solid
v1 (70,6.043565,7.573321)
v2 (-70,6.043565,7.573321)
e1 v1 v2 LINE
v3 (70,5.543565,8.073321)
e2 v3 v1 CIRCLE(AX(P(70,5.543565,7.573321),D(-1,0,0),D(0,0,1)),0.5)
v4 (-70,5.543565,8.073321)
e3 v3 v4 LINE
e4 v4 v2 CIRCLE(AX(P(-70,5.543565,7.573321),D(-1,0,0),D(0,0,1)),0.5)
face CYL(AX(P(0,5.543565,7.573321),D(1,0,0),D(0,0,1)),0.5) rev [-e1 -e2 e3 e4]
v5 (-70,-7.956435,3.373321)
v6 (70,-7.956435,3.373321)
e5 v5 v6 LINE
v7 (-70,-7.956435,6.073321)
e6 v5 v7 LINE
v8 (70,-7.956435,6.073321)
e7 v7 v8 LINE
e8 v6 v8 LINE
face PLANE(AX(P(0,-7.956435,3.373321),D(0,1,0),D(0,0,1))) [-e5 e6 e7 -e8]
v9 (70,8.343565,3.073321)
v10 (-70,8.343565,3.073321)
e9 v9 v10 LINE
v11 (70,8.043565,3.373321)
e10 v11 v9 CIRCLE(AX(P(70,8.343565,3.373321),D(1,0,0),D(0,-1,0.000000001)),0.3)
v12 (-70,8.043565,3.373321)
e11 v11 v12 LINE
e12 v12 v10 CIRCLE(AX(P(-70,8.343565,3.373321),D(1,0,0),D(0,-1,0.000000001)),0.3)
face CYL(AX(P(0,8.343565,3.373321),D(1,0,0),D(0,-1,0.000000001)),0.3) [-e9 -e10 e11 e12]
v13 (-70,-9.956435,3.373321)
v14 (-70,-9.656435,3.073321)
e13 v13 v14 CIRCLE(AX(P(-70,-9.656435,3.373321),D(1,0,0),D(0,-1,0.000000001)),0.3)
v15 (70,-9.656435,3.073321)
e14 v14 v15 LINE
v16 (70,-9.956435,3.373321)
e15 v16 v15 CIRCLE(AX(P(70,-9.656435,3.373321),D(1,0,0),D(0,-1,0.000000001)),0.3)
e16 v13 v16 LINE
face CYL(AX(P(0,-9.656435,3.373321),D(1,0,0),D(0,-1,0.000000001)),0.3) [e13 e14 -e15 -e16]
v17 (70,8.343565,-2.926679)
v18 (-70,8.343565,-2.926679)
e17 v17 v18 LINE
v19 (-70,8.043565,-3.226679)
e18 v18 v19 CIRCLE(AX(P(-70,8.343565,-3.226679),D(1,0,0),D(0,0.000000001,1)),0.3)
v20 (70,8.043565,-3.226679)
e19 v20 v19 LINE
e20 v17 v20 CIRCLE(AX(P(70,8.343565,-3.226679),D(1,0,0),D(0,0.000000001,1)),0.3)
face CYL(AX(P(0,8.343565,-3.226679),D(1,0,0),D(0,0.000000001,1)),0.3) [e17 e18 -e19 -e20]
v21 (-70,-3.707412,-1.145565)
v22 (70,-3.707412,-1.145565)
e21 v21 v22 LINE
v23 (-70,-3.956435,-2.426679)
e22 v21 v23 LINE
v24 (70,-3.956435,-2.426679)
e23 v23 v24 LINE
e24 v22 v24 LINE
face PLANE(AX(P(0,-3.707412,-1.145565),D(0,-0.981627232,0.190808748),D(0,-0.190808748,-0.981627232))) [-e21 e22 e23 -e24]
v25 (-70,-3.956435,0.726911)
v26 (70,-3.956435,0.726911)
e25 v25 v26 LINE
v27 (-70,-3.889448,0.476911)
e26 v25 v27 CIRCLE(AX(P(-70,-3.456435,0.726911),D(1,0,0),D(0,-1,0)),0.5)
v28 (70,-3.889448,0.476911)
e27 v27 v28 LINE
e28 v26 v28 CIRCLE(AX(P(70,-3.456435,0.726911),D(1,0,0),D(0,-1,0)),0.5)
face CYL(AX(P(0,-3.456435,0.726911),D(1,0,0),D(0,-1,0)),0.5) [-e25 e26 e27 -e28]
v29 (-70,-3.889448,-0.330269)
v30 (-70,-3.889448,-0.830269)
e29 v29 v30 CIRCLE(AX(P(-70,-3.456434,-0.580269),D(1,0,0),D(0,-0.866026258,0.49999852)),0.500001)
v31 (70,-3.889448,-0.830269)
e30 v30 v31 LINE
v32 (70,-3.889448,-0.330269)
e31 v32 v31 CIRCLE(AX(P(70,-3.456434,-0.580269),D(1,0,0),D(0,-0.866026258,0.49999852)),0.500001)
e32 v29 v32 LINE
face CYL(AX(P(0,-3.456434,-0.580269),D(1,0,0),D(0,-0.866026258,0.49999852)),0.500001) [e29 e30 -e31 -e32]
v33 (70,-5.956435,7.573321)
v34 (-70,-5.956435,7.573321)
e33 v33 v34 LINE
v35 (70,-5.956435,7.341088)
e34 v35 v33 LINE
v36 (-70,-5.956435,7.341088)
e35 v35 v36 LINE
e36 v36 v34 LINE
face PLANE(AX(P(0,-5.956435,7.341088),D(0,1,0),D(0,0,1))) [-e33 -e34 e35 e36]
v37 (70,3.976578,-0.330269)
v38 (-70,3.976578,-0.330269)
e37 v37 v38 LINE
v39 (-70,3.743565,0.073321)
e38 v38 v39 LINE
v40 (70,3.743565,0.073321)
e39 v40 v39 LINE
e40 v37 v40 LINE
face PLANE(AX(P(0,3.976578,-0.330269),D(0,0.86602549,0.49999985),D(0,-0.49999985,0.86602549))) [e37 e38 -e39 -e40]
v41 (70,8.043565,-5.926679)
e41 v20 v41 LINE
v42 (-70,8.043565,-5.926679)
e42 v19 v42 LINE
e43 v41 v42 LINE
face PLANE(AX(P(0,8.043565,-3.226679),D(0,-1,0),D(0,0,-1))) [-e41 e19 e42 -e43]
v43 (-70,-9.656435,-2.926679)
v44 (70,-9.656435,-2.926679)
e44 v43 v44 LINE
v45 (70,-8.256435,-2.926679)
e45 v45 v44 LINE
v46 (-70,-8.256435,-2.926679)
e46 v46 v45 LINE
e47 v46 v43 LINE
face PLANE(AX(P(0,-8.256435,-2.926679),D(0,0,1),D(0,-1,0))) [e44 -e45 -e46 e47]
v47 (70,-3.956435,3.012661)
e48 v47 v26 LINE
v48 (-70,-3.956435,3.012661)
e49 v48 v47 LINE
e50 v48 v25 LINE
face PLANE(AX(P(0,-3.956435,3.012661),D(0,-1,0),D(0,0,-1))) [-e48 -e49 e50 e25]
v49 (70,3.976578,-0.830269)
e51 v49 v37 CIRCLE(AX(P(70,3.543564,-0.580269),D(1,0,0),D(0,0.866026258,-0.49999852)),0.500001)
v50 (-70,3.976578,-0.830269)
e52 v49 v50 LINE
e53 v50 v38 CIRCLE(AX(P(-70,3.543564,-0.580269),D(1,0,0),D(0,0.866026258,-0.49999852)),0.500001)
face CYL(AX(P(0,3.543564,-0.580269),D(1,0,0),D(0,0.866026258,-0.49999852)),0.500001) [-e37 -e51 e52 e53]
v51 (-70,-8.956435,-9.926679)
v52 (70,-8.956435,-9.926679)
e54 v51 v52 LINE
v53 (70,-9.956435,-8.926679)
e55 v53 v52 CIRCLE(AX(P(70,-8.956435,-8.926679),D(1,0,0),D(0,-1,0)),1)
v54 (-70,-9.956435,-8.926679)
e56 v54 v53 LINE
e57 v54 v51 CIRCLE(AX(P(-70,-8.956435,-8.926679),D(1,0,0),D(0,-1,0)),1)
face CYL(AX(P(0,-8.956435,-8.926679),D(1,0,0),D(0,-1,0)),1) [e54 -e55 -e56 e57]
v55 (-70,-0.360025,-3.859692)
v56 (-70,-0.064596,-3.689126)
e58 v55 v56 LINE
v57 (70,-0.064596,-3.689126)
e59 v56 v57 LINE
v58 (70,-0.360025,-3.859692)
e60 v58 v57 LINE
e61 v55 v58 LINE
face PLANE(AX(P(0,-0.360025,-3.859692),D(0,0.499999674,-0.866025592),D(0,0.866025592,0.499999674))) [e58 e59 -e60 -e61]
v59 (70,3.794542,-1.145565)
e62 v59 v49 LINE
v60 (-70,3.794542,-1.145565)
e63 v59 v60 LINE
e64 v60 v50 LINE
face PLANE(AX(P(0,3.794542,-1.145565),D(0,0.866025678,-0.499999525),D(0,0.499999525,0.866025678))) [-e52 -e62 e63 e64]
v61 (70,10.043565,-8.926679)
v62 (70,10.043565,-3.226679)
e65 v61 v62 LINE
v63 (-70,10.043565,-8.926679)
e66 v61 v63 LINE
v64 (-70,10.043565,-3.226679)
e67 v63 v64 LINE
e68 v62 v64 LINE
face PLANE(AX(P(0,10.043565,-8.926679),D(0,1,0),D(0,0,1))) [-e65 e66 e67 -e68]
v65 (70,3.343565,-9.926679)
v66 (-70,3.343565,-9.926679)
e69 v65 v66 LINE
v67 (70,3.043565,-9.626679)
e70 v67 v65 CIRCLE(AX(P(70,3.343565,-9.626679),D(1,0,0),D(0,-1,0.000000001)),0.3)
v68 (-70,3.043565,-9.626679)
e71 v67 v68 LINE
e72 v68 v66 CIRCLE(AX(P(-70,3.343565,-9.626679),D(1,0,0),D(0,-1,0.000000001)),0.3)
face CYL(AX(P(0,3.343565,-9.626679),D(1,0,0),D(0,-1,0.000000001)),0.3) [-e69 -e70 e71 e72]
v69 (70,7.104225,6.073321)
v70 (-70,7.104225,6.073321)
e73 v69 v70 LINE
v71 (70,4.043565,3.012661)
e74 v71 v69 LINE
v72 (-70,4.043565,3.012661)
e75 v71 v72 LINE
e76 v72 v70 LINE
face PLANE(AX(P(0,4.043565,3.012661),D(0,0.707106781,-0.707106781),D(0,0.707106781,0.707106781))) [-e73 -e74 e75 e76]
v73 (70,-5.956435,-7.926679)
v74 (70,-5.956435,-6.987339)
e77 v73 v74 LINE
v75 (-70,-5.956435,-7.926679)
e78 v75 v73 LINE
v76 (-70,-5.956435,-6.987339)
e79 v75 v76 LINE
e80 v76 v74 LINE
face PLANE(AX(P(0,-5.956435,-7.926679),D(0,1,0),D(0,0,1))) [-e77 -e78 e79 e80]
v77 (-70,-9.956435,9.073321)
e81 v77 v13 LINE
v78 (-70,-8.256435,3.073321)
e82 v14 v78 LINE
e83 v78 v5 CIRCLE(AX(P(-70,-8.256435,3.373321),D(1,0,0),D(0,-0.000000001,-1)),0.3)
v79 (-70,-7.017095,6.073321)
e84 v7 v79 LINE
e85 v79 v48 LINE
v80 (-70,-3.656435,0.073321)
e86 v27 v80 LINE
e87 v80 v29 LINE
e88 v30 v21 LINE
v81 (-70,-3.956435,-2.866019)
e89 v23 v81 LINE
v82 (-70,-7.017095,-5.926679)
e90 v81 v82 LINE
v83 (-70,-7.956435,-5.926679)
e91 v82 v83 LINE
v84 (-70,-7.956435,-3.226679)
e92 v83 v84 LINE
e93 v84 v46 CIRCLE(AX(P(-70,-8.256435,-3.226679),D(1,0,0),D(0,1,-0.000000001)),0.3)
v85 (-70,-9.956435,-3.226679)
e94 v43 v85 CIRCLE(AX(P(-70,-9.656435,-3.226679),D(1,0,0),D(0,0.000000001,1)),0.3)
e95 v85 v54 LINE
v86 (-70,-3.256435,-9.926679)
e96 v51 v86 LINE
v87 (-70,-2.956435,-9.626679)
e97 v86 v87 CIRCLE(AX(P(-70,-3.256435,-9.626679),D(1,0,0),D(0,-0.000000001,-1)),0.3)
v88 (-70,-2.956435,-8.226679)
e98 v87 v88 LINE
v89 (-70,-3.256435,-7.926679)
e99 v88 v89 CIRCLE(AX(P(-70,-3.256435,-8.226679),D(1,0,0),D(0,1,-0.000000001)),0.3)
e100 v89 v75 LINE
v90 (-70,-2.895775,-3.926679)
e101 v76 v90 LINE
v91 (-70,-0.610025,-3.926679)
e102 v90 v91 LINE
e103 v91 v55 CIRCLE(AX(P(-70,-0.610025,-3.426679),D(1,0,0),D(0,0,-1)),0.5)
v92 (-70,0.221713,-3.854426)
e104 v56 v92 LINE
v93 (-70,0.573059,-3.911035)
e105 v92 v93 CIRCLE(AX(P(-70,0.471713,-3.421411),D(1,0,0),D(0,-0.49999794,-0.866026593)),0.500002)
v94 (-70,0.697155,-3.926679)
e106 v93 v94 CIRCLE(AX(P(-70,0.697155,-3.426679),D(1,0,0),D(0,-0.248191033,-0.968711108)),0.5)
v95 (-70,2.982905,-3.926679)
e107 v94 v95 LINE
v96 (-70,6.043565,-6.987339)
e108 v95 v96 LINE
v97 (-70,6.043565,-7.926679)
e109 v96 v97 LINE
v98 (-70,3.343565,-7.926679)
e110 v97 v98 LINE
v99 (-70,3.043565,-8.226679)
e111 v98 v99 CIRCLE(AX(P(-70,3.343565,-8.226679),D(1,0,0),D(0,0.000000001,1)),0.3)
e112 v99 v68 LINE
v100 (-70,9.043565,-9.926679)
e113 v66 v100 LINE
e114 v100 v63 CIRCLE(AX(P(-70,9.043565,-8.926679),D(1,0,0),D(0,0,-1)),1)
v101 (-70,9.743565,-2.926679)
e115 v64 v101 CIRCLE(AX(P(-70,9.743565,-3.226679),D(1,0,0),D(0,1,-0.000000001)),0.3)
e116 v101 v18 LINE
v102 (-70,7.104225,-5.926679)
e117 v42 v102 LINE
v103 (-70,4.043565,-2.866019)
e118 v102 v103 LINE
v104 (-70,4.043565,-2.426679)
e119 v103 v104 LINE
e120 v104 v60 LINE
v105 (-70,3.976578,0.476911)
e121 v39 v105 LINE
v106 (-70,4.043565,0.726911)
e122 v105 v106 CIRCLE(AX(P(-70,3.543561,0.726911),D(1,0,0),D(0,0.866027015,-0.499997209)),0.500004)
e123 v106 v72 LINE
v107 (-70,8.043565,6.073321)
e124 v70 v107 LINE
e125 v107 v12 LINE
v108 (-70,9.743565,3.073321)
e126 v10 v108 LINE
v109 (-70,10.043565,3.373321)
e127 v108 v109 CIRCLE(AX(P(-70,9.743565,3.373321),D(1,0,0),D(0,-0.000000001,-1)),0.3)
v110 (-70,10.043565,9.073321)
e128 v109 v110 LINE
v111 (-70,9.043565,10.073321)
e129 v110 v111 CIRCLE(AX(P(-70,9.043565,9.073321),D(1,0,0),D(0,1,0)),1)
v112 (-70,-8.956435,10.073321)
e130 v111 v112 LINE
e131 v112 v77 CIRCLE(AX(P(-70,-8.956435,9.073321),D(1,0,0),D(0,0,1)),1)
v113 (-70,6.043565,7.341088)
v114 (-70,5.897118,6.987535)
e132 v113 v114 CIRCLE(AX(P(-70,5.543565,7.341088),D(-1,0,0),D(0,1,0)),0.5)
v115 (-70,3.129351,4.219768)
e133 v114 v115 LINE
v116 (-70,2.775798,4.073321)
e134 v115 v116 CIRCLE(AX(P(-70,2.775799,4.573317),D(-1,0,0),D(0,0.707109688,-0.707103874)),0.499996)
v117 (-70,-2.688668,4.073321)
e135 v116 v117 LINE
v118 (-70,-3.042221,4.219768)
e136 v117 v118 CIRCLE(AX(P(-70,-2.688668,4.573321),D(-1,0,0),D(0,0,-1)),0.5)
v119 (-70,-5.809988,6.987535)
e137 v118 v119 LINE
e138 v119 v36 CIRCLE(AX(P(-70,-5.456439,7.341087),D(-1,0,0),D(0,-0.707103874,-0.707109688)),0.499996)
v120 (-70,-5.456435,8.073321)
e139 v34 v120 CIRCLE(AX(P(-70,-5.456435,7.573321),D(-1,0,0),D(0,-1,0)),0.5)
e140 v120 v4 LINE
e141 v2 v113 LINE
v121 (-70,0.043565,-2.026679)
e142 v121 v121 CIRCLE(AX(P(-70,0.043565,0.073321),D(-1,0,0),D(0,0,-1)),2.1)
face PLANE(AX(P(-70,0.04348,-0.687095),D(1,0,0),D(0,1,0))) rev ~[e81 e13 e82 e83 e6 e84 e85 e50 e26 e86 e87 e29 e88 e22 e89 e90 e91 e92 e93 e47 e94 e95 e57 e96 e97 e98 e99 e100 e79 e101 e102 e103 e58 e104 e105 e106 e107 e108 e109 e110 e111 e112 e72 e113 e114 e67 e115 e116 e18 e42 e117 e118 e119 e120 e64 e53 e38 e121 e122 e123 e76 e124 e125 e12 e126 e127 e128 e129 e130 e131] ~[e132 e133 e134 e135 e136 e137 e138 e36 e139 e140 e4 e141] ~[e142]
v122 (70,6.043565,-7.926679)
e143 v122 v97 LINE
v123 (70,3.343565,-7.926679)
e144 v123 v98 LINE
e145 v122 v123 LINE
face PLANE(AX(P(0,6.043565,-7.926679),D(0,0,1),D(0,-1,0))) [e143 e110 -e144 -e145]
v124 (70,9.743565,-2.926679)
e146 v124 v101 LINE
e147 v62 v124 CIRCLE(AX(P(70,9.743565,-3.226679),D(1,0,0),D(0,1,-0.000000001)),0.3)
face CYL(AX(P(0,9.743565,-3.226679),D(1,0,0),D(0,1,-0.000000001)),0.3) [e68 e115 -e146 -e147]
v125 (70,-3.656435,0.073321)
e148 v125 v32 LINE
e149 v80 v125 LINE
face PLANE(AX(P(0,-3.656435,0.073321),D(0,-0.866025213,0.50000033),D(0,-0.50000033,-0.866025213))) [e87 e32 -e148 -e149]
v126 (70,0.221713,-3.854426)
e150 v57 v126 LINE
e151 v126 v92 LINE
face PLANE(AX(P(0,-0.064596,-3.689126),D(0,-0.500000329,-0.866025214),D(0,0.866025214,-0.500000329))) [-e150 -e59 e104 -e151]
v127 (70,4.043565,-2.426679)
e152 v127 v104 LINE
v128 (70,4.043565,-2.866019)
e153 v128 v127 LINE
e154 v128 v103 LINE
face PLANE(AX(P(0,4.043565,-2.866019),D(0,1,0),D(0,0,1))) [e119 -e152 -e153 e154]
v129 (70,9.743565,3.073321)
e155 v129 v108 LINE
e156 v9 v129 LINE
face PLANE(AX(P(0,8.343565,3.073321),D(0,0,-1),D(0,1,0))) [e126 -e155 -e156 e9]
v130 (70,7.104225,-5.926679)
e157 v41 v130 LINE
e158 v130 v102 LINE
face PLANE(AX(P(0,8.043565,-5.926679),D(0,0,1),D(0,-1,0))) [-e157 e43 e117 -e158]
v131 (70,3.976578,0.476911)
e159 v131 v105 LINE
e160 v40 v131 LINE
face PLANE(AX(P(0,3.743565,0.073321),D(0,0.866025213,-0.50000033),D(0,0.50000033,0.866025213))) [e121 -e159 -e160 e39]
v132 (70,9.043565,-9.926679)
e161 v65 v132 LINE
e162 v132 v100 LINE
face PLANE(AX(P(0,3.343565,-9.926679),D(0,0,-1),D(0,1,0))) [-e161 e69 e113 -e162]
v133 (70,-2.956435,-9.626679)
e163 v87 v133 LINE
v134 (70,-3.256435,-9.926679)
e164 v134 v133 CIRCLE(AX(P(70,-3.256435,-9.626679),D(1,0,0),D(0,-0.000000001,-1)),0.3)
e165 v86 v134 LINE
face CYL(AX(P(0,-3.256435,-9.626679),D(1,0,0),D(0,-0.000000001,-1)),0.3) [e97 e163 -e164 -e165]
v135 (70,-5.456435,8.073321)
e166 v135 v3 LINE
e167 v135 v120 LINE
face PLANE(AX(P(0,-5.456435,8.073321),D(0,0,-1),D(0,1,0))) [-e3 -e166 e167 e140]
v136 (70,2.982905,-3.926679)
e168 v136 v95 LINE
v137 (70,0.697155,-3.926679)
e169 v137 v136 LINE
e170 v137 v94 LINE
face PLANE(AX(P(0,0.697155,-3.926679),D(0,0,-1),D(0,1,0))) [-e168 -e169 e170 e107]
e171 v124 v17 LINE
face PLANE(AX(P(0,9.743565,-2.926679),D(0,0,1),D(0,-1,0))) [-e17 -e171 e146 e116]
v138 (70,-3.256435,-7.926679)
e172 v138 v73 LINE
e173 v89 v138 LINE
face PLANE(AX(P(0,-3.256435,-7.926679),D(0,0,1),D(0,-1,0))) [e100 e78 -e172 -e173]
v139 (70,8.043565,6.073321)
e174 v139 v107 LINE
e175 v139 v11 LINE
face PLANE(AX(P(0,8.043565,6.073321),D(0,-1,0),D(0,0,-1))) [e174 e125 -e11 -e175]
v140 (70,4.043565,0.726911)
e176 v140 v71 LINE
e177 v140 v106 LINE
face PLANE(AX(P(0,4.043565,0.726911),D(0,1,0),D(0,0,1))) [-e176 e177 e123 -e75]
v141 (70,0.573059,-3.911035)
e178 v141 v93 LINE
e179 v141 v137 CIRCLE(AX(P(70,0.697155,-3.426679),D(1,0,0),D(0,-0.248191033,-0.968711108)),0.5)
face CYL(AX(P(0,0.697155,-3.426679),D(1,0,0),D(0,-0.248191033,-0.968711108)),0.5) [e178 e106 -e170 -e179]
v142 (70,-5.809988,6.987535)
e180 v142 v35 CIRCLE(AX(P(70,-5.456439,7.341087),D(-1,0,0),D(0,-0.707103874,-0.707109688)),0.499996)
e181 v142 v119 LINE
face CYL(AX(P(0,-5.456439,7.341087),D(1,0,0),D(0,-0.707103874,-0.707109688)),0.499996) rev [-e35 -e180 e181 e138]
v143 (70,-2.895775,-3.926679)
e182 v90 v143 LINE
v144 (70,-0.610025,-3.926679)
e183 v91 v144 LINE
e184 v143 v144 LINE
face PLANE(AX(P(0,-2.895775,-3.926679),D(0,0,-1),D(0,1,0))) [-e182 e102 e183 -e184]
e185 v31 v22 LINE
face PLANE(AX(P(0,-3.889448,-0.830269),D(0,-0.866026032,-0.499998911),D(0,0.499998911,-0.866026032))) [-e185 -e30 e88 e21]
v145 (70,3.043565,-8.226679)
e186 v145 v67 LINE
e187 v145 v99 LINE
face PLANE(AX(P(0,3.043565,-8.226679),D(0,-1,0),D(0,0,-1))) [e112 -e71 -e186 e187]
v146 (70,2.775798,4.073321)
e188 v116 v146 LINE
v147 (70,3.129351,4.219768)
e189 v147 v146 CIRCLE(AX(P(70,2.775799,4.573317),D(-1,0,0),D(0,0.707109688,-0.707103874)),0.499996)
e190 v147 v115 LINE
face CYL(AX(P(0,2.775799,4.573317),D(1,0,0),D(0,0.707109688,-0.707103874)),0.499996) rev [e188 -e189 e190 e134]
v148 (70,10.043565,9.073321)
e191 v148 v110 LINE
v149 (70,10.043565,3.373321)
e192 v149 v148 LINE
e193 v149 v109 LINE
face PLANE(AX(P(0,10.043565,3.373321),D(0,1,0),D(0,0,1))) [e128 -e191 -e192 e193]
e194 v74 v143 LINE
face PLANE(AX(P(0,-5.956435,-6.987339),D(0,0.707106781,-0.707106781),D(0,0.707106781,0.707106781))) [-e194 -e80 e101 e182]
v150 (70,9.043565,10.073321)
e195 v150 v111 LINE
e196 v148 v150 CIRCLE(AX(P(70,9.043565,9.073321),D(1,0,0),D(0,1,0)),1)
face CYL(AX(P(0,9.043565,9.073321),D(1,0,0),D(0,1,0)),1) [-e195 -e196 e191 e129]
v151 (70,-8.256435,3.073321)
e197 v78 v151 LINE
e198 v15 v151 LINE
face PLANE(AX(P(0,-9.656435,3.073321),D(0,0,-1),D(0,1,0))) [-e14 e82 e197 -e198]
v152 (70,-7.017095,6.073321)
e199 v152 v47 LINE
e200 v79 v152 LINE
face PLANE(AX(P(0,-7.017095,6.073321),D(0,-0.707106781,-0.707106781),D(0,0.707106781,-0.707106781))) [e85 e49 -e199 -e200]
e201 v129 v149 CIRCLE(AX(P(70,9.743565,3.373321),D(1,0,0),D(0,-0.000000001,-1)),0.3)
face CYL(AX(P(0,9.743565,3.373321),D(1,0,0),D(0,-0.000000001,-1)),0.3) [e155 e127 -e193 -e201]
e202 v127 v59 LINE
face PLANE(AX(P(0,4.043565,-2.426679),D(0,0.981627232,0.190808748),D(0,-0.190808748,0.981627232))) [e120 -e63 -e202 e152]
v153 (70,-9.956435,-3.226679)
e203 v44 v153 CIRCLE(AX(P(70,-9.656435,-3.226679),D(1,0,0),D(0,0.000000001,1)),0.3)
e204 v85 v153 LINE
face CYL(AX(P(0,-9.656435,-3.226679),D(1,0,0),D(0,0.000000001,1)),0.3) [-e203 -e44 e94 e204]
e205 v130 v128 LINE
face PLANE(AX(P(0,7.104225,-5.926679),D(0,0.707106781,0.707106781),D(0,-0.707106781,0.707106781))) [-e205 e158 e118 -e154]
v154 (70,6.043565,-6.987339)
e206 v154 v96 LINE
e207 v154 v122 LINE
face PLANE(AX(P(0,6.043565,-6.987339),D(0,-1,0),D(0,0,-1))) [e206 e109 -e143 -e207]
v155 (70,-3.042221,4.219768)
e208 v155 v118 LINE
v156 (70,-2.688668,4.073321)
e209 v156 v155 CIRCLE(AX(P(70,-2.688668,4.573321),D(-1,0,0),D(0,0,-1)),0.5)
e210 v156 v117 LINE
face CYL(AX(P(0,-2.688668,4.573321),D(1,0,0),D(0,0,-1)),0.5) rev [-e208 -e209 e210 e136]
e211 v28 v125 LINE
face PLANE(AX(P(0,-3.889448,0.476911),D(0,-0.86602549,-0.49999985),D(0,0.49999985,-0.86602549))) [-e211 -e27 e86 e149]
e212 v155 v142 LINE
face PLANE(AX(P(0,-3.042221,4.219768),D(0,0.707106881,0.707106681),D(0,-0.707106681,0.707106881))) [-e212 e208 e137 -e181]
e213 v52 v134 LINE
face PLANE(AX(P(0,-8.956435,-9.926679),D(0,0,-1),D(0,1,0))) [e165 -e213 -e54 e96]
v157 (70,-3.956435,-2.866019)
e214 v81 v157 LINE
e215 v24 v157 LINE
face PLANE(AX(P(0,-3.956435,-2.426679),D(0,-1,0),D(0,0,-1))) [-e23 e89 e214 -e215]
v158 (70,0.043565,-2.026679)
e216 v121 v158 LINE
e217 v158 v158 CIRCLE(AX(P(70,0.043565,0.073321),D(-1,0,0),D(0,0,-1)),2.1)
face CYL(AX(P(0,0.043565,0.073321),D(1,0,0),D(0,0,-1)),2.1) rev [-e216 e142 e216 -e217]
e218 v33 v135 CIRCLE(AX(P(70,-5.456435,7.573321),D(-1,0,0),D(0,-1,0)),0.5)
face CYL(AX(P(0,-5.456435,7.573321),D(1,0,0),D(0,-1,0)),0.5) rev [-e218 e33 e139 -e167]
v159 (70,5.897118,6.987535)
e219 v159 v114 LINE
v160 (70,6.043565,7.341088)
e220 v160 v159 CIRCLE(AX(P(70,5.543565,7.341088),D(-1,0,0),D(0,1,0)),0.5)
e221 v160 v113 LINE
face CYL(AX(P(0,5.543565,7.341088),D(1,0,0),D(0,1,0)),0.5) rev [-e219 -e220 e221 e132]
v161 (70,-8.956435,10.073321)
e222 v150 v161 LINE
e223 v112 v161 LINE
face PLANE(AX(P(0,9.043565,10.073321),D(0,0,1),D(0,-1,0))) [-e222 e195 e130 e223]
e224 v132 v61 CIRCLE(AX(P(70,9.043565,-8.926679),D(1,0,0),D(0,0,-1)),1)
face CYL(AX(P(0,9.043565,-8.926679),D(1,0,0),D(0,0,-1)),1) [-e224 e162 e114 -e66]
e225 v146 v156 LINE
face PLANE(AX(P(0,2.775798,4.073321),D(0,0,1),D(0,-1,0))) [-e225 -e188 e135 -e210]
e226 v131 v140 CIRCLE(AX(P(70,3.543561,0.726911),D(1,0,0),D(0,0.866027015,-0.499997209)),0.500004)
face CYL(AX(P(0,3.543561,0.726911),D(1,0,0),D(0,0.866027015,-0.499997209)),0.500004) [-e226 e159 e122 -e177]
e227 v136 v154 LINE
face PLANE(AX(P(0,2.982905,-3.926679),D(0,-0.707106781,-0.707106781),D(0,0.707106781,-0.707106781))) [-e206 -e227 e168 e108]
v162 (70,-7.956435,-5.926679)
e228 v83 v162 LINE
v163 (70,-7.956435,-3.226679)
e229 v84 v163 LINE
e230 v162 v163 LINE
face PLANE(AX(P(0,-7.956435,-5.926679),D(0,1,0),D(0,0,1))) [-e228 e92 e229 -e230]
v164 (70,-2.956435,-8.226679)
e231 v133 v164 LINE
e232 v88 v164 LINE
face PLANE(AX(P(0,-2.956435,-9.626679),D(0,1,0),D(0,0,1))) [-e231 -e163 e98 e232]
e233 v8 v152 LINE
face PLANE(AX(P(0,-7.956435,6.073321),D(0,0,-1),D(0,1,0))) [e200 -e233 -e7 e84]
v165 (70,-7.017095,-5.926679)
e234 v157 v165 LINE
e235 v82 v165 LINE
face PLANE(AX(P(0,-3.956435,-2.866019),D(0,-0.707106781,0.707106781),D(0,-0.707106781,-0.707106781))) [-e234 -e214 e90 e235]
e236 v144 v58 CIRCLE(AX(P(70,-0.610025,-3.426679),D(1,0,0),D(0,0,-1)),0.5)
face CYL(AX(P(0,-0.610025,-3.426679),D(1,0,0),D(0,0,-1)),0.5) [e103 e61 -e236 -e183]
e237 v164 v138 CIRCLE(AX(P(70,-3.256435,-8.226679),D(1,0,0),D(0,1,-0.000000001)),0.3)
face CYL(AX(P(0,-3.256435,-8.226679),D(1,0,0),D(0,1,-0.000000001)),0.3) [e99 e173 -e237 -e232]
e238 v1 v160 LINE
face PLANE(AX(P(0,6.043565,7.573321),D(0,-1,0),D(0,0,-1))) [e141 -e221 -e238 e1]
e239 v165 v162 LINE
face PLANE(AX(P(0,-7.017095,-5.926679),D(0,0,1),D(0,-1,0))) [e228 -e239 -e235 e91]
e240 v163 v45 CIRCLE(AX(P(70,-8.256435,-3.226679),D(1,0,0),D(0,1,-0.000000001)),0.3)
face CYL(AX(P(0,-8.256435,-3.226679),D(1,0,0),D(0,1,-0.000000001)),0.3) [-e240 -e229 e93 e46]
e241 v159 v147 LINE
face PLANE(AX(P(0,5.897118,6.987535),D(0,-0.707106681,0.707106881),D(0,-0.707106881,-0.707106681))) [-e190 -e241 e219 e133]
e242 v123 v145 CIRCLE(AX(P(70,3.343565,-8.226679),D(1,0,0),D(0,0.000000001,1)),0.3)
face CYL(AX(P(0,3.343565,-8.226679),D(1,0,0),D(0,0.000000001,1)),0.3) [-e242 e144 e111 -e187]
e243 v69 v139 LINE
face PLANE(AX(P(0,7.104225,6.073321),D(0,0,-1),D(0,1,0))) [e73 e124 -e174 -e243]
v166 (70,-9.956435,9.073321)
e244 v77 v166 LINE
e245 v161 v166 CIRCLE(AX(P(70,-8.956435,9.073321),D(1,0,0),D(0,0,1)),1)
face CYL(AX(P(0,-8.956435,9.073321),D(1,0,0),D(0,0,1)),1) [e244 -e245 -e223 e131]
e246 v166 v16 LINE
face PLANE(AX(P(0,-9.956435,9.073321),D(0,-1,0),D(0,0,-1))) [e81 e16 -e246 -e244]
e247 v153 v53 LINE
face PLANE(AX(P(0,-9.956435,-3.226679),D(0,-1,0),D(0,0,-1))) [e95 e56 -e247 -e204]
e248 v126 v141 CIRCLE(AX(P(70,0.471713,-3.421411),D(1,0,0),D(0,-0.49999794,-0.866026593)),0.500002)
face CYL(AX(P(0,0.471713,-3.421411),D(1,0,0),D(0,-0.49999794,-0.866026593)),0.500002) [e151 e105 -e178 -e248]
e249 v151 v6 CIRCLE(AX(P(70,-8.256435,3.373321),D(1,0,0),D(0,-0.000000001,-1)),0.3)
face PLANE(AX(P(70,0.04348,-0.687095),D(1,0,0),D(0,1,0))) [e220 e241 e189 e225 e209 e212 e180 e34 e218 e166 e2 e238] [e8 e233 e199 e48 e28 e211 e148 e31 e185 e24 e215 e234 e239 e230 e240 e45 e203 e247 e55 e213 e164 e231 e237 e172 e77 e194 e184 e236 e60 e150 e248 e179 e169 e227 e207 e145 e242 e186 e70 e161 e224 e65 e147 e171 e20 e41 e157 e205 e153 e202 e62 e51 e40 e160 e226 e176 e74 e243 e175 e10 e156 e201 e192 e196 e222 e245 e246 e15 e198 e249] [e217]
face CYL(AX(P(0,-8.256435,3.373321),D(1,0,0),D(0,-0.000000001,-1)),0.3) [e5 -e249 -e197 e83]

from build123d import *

# Parameters (mm, degrees)
F1_DEPTH = 70


# Not quite as in the source:
# - ends of sketch curves that miss each other by under 0.0002 mm in the source are joined


with BuildPart() as f1:
    # F0 (on Right) → F1 (new body, symmetric)
    with BuildSketch(Plane.YZ):
        with BuildLine():
            Line((9.043565, 10.073321), (0.043565, 10.073321))
            Line((0.043565, 10.073321), (-8.956435, 10.073321))
            ThreePointArc((-8.956435, 10.073321), (-9.6635417812, 9.7804277812), (-9.956435, 9.073321))
            Line((-9.956435, 9.073321), (-9.956435, 3.373321))
            ThreePointArc((-9.956435, 3.373321), (-9.8685670344, 3.1611889656), (-9.656435, 3.073321))
            Line((-9.656435, 3.073321), (-8.256435, 3.073321))
            ThreePointArc((-8.256435, 3.073321), (-8.0443029656, 3.1611889656), (-7.956435, 3.373321))
            Line((-7.956435, 3.373321), (-7.956435, 6.073321))
            Line((-7.956435, 6.073321), (-7.017095, 6.073321))
            Line((-7.017095, 6.073321), (-3.956435, 3.012661))
            Line((-3.956435, 3.012661), (-3.956435, 0.726911))
            ThreePointArc((-3.956435, 0.726911), (-3.9393979324, 0.5975015494), (-3.8894477764, 0.4769111291))
            Line((-3.8894477764, 0.4769111291), (-3.656435, 0.073321))
            Line((-3.656435, 0.073321), (-3.889448, -0.330269))
            ThreePointArc((-3.889448, -0.330269), (-3.956435, -0.580269), (-3.8894477764, -0.8302688709))
            Line((-3.8894477764, -0.8302688709), (-3.707412, -1.145565))
            Line((-3.707412, -1.145565), (-3.956435, -2.426679))
            Line((-3.956435, -2.426679), (-3.956435, -2.866019))
            Line((-3.956435, -2.866019), (-7.017095, -5.926679))
            Line((-7.017095, -5.926679), (-7.956435, -5.926679))
            Line((-7.956435, -5.926679), (-7.956435, -3.226679))
            ThreePointArc((-7.956435, -3.226679), (-8.0443029656, -3.0145469656), (-8.256435, -2.926679))
            Line((-8.256435, -2.926679), (-9.656435, -2.926679))
            ThreePointArc((-9.656435, -2.926679), (-9.8685670344, -3.0145469656), (-9.956435, -3.226679))
            Line((-9.956435, -3.226679), (-9.956435, -8.926679))
            ThreePointArc((-9.956435, -8.926679), (-9.6635417812, -9.6337857812), (-8.956435, -9.926679))
            Line((-8.956435, -9.926679), (-3.256435, -9.926679))
            ThreePointArc((-3.256435, -9.926679), (-3.0443029656, -9.8388110344), (-2.956435, -9.626679))
            Line((-2.956435, -9.626679), (-2.956435, -8.226679))
            ThreePointArc((-2.956435, -8.226679), (-3.0443029656, -8.0145469656), (-3.256435, -7.926679))
            Line((-3.256435, -7.926679), (-5.956435, -7.926679))
            Line((-5.956435, -7.926679), (-5.956435, -6.987339))
            Line((-5.956435, -6.987339), (-2.895775, -3.926679))
            Line((-2.895775, -3.926679), (-0.610025, -3.926679))
            ThreePointArc((-0.610025, -3.926679), (-0.4806155494, -3.9096419324), (-0.3600251291, -3.8596917764))
            Line((-0.3600251291, -3.8596917764), (-0.0645959325, -3.6891257984))
            Line((-0.0645959325, -3.6891257984), (0.2217128734, -3.8544264098))
            ThreePointArc((0.2217128734, -3.8544264098), (0.3921793907, -3.9150473077), (0.5730594828, -3.9110345539))
            ThreePointArc((0.5730594828, -3.9110345539), (0.6346161199, -3.9227524708), (0.697155, -3.926679))
            Line((0.697155, -3.926679), (2.982905, -3.926679))
            Line((2.982905, -3.926679), (6.043565, -6.987339))
            Line((6.043565, -6.987339), (6.043565, -7.926679))
            Line((6.043565, -7.926679), (3.343565, -7.926679))
            ThreePointArc((3.343565, -7.926679), (3.1314329656, -8.0145469656), (3.043565, -8.226679))
            Line((3.043565, -8.226679), (3.043565, -9.626679))
            ThreePointArc((3.043565, -9.626679), (3.1314329656, -9.8388110344), (3.343565, -9.926679))
            Line((3.343565, -9.926679), (9.043565, -9.926679))
            ThreePointArc((9.043565, -9.926679), (9.7506717812, -9.6337857812), (10.043565, -8.926679))
            Line((10.043565, -8.926679), (10.043565, -3.226679))
            ThreePointArc((10.043565, -3.226679), (9.9556970344, -3.0145469656), (9.743565, -2.926679))
            Line((9.743565, -2.926679), (8.343565, -2.926679))
            ThreePointArc((8.343565, -2.926679), (8.1314329656, -3.0145469656), (8.043565, -3.226679))
            Line((8.043565, -3.226679), (8.043565, -5.926679))
            Line((8.043565, -5.926679), (7.104225, -5.926679))
            Line((7.104225, -5.926679), (4.043565, -2.866019))
            Line((4.043565, -2.866019), (4.043565, -2.426679))
            Line((4.043565, -2.426679), (3.794542, -1.145565))
            Line((3.794542, -1.145565), (3.976578, -0.830269))
            ThreePointArc((3.976578, -0.830269), (4.043565, -0.580269), (3.9765777764, -0.3302691291))
            Line((3.9765777764, -0.3302691291), (3.743565, 0.073321))
            Line((3.743565, 0.073321), (3.976578, 0.476911))
            ThreePointArc((3.976578, 0.476911), (4.0265279324, 0.5975015494), (4.043565, 0.726911))
            Line((4.043565, 0.726911), (4.043565, 3.012661))
            Line((4.043565, 3.012661), (7.104225, 6.073321))
            Line((7.104225, 6.073321), (8.043565, 6.073321))
            Line((8.043565, 6.073321), (8.043565, 3.373321))
            ThreePointArc((8.043565, 3.373321), (8.1314329656, 3.1611889656), (8.343565, 3.073321))
            Line((8.343565, 3.073321), (9.743565, 3.073321))
            ThreePointArc((9.743565, 3.073321), (9.9556970344, 3.1611889656), (10.043565, 3.373321))
            Line((10.043565, 3.373321), (10.043565, 9.073321))
            ThreePointArc((10.043565, 9.073321), (9.7506717812, 9.7804277812), (9.043565, 10.073321))
        make_face()
        with BuildLine():
            ThreePointArc((0.043565, 2.173321), (2.143565, 0.073321), (0.043565, -2.026679))
            ThreePointArc((0.043565, -2.026679), (-2.056435, 0.073321), (0.043565, 2.173321))
        make_face(mode=Mode.SUBTRACT)
        with BuildLine():
            Line((2.775798, 4.073321), (0.043565, 4.073321))
            Line((0.043565, 4.073321), (-2.688668, 4.073321))
            ThreePointArc((-2.688668, 4.073321), (-2.8800097162, 4.1113812337), (-3.0422213906, 4.2197676094))
            Line((-3.0422213906, 4.2197676094), (-5.809988, 6.987535))
            ThreePointArc((-5.809988, 6.987535), (-5.9183747663, 7.1497462838), (-5.956435, 7.341088))
            Line((-5.956435, 7.341088), (-5.956435, 7.573321))
            ThreePointArc((-5.956435, 7.573321), (-5.8099883906, 7.9268743906), (-5.456435, 8.073321))
            Line((-5.456435, 8.073321), (0.043565, 8.073321))
            Line((0.043565, 8.073321), (5.543565, 8.073321))
            ThreePointArc((5.543565, 8.073321), (5.8971183906, 7.9268743906), (6.043565, 7.573321))
            Line((6.043565, 7.573321), (6.043565, 7.341088))
            ThreePointArc((6.043565, 7.341088), (6.0055047663, 7.1497462838), (5.8971183906, 6.9875346094))
            Line((5.8971183906, 6.9875346094), (3.129351, 4.219768))
            ThreePointArc((3.129351, 4.219768), (2.9671397162, 4.1113812337), (2.775798, 4.073321))
        make_face(mode=Mode.SUBTRACT)
    extrude(amount=F1_DEPTH, both=True)


solid = f1.part
